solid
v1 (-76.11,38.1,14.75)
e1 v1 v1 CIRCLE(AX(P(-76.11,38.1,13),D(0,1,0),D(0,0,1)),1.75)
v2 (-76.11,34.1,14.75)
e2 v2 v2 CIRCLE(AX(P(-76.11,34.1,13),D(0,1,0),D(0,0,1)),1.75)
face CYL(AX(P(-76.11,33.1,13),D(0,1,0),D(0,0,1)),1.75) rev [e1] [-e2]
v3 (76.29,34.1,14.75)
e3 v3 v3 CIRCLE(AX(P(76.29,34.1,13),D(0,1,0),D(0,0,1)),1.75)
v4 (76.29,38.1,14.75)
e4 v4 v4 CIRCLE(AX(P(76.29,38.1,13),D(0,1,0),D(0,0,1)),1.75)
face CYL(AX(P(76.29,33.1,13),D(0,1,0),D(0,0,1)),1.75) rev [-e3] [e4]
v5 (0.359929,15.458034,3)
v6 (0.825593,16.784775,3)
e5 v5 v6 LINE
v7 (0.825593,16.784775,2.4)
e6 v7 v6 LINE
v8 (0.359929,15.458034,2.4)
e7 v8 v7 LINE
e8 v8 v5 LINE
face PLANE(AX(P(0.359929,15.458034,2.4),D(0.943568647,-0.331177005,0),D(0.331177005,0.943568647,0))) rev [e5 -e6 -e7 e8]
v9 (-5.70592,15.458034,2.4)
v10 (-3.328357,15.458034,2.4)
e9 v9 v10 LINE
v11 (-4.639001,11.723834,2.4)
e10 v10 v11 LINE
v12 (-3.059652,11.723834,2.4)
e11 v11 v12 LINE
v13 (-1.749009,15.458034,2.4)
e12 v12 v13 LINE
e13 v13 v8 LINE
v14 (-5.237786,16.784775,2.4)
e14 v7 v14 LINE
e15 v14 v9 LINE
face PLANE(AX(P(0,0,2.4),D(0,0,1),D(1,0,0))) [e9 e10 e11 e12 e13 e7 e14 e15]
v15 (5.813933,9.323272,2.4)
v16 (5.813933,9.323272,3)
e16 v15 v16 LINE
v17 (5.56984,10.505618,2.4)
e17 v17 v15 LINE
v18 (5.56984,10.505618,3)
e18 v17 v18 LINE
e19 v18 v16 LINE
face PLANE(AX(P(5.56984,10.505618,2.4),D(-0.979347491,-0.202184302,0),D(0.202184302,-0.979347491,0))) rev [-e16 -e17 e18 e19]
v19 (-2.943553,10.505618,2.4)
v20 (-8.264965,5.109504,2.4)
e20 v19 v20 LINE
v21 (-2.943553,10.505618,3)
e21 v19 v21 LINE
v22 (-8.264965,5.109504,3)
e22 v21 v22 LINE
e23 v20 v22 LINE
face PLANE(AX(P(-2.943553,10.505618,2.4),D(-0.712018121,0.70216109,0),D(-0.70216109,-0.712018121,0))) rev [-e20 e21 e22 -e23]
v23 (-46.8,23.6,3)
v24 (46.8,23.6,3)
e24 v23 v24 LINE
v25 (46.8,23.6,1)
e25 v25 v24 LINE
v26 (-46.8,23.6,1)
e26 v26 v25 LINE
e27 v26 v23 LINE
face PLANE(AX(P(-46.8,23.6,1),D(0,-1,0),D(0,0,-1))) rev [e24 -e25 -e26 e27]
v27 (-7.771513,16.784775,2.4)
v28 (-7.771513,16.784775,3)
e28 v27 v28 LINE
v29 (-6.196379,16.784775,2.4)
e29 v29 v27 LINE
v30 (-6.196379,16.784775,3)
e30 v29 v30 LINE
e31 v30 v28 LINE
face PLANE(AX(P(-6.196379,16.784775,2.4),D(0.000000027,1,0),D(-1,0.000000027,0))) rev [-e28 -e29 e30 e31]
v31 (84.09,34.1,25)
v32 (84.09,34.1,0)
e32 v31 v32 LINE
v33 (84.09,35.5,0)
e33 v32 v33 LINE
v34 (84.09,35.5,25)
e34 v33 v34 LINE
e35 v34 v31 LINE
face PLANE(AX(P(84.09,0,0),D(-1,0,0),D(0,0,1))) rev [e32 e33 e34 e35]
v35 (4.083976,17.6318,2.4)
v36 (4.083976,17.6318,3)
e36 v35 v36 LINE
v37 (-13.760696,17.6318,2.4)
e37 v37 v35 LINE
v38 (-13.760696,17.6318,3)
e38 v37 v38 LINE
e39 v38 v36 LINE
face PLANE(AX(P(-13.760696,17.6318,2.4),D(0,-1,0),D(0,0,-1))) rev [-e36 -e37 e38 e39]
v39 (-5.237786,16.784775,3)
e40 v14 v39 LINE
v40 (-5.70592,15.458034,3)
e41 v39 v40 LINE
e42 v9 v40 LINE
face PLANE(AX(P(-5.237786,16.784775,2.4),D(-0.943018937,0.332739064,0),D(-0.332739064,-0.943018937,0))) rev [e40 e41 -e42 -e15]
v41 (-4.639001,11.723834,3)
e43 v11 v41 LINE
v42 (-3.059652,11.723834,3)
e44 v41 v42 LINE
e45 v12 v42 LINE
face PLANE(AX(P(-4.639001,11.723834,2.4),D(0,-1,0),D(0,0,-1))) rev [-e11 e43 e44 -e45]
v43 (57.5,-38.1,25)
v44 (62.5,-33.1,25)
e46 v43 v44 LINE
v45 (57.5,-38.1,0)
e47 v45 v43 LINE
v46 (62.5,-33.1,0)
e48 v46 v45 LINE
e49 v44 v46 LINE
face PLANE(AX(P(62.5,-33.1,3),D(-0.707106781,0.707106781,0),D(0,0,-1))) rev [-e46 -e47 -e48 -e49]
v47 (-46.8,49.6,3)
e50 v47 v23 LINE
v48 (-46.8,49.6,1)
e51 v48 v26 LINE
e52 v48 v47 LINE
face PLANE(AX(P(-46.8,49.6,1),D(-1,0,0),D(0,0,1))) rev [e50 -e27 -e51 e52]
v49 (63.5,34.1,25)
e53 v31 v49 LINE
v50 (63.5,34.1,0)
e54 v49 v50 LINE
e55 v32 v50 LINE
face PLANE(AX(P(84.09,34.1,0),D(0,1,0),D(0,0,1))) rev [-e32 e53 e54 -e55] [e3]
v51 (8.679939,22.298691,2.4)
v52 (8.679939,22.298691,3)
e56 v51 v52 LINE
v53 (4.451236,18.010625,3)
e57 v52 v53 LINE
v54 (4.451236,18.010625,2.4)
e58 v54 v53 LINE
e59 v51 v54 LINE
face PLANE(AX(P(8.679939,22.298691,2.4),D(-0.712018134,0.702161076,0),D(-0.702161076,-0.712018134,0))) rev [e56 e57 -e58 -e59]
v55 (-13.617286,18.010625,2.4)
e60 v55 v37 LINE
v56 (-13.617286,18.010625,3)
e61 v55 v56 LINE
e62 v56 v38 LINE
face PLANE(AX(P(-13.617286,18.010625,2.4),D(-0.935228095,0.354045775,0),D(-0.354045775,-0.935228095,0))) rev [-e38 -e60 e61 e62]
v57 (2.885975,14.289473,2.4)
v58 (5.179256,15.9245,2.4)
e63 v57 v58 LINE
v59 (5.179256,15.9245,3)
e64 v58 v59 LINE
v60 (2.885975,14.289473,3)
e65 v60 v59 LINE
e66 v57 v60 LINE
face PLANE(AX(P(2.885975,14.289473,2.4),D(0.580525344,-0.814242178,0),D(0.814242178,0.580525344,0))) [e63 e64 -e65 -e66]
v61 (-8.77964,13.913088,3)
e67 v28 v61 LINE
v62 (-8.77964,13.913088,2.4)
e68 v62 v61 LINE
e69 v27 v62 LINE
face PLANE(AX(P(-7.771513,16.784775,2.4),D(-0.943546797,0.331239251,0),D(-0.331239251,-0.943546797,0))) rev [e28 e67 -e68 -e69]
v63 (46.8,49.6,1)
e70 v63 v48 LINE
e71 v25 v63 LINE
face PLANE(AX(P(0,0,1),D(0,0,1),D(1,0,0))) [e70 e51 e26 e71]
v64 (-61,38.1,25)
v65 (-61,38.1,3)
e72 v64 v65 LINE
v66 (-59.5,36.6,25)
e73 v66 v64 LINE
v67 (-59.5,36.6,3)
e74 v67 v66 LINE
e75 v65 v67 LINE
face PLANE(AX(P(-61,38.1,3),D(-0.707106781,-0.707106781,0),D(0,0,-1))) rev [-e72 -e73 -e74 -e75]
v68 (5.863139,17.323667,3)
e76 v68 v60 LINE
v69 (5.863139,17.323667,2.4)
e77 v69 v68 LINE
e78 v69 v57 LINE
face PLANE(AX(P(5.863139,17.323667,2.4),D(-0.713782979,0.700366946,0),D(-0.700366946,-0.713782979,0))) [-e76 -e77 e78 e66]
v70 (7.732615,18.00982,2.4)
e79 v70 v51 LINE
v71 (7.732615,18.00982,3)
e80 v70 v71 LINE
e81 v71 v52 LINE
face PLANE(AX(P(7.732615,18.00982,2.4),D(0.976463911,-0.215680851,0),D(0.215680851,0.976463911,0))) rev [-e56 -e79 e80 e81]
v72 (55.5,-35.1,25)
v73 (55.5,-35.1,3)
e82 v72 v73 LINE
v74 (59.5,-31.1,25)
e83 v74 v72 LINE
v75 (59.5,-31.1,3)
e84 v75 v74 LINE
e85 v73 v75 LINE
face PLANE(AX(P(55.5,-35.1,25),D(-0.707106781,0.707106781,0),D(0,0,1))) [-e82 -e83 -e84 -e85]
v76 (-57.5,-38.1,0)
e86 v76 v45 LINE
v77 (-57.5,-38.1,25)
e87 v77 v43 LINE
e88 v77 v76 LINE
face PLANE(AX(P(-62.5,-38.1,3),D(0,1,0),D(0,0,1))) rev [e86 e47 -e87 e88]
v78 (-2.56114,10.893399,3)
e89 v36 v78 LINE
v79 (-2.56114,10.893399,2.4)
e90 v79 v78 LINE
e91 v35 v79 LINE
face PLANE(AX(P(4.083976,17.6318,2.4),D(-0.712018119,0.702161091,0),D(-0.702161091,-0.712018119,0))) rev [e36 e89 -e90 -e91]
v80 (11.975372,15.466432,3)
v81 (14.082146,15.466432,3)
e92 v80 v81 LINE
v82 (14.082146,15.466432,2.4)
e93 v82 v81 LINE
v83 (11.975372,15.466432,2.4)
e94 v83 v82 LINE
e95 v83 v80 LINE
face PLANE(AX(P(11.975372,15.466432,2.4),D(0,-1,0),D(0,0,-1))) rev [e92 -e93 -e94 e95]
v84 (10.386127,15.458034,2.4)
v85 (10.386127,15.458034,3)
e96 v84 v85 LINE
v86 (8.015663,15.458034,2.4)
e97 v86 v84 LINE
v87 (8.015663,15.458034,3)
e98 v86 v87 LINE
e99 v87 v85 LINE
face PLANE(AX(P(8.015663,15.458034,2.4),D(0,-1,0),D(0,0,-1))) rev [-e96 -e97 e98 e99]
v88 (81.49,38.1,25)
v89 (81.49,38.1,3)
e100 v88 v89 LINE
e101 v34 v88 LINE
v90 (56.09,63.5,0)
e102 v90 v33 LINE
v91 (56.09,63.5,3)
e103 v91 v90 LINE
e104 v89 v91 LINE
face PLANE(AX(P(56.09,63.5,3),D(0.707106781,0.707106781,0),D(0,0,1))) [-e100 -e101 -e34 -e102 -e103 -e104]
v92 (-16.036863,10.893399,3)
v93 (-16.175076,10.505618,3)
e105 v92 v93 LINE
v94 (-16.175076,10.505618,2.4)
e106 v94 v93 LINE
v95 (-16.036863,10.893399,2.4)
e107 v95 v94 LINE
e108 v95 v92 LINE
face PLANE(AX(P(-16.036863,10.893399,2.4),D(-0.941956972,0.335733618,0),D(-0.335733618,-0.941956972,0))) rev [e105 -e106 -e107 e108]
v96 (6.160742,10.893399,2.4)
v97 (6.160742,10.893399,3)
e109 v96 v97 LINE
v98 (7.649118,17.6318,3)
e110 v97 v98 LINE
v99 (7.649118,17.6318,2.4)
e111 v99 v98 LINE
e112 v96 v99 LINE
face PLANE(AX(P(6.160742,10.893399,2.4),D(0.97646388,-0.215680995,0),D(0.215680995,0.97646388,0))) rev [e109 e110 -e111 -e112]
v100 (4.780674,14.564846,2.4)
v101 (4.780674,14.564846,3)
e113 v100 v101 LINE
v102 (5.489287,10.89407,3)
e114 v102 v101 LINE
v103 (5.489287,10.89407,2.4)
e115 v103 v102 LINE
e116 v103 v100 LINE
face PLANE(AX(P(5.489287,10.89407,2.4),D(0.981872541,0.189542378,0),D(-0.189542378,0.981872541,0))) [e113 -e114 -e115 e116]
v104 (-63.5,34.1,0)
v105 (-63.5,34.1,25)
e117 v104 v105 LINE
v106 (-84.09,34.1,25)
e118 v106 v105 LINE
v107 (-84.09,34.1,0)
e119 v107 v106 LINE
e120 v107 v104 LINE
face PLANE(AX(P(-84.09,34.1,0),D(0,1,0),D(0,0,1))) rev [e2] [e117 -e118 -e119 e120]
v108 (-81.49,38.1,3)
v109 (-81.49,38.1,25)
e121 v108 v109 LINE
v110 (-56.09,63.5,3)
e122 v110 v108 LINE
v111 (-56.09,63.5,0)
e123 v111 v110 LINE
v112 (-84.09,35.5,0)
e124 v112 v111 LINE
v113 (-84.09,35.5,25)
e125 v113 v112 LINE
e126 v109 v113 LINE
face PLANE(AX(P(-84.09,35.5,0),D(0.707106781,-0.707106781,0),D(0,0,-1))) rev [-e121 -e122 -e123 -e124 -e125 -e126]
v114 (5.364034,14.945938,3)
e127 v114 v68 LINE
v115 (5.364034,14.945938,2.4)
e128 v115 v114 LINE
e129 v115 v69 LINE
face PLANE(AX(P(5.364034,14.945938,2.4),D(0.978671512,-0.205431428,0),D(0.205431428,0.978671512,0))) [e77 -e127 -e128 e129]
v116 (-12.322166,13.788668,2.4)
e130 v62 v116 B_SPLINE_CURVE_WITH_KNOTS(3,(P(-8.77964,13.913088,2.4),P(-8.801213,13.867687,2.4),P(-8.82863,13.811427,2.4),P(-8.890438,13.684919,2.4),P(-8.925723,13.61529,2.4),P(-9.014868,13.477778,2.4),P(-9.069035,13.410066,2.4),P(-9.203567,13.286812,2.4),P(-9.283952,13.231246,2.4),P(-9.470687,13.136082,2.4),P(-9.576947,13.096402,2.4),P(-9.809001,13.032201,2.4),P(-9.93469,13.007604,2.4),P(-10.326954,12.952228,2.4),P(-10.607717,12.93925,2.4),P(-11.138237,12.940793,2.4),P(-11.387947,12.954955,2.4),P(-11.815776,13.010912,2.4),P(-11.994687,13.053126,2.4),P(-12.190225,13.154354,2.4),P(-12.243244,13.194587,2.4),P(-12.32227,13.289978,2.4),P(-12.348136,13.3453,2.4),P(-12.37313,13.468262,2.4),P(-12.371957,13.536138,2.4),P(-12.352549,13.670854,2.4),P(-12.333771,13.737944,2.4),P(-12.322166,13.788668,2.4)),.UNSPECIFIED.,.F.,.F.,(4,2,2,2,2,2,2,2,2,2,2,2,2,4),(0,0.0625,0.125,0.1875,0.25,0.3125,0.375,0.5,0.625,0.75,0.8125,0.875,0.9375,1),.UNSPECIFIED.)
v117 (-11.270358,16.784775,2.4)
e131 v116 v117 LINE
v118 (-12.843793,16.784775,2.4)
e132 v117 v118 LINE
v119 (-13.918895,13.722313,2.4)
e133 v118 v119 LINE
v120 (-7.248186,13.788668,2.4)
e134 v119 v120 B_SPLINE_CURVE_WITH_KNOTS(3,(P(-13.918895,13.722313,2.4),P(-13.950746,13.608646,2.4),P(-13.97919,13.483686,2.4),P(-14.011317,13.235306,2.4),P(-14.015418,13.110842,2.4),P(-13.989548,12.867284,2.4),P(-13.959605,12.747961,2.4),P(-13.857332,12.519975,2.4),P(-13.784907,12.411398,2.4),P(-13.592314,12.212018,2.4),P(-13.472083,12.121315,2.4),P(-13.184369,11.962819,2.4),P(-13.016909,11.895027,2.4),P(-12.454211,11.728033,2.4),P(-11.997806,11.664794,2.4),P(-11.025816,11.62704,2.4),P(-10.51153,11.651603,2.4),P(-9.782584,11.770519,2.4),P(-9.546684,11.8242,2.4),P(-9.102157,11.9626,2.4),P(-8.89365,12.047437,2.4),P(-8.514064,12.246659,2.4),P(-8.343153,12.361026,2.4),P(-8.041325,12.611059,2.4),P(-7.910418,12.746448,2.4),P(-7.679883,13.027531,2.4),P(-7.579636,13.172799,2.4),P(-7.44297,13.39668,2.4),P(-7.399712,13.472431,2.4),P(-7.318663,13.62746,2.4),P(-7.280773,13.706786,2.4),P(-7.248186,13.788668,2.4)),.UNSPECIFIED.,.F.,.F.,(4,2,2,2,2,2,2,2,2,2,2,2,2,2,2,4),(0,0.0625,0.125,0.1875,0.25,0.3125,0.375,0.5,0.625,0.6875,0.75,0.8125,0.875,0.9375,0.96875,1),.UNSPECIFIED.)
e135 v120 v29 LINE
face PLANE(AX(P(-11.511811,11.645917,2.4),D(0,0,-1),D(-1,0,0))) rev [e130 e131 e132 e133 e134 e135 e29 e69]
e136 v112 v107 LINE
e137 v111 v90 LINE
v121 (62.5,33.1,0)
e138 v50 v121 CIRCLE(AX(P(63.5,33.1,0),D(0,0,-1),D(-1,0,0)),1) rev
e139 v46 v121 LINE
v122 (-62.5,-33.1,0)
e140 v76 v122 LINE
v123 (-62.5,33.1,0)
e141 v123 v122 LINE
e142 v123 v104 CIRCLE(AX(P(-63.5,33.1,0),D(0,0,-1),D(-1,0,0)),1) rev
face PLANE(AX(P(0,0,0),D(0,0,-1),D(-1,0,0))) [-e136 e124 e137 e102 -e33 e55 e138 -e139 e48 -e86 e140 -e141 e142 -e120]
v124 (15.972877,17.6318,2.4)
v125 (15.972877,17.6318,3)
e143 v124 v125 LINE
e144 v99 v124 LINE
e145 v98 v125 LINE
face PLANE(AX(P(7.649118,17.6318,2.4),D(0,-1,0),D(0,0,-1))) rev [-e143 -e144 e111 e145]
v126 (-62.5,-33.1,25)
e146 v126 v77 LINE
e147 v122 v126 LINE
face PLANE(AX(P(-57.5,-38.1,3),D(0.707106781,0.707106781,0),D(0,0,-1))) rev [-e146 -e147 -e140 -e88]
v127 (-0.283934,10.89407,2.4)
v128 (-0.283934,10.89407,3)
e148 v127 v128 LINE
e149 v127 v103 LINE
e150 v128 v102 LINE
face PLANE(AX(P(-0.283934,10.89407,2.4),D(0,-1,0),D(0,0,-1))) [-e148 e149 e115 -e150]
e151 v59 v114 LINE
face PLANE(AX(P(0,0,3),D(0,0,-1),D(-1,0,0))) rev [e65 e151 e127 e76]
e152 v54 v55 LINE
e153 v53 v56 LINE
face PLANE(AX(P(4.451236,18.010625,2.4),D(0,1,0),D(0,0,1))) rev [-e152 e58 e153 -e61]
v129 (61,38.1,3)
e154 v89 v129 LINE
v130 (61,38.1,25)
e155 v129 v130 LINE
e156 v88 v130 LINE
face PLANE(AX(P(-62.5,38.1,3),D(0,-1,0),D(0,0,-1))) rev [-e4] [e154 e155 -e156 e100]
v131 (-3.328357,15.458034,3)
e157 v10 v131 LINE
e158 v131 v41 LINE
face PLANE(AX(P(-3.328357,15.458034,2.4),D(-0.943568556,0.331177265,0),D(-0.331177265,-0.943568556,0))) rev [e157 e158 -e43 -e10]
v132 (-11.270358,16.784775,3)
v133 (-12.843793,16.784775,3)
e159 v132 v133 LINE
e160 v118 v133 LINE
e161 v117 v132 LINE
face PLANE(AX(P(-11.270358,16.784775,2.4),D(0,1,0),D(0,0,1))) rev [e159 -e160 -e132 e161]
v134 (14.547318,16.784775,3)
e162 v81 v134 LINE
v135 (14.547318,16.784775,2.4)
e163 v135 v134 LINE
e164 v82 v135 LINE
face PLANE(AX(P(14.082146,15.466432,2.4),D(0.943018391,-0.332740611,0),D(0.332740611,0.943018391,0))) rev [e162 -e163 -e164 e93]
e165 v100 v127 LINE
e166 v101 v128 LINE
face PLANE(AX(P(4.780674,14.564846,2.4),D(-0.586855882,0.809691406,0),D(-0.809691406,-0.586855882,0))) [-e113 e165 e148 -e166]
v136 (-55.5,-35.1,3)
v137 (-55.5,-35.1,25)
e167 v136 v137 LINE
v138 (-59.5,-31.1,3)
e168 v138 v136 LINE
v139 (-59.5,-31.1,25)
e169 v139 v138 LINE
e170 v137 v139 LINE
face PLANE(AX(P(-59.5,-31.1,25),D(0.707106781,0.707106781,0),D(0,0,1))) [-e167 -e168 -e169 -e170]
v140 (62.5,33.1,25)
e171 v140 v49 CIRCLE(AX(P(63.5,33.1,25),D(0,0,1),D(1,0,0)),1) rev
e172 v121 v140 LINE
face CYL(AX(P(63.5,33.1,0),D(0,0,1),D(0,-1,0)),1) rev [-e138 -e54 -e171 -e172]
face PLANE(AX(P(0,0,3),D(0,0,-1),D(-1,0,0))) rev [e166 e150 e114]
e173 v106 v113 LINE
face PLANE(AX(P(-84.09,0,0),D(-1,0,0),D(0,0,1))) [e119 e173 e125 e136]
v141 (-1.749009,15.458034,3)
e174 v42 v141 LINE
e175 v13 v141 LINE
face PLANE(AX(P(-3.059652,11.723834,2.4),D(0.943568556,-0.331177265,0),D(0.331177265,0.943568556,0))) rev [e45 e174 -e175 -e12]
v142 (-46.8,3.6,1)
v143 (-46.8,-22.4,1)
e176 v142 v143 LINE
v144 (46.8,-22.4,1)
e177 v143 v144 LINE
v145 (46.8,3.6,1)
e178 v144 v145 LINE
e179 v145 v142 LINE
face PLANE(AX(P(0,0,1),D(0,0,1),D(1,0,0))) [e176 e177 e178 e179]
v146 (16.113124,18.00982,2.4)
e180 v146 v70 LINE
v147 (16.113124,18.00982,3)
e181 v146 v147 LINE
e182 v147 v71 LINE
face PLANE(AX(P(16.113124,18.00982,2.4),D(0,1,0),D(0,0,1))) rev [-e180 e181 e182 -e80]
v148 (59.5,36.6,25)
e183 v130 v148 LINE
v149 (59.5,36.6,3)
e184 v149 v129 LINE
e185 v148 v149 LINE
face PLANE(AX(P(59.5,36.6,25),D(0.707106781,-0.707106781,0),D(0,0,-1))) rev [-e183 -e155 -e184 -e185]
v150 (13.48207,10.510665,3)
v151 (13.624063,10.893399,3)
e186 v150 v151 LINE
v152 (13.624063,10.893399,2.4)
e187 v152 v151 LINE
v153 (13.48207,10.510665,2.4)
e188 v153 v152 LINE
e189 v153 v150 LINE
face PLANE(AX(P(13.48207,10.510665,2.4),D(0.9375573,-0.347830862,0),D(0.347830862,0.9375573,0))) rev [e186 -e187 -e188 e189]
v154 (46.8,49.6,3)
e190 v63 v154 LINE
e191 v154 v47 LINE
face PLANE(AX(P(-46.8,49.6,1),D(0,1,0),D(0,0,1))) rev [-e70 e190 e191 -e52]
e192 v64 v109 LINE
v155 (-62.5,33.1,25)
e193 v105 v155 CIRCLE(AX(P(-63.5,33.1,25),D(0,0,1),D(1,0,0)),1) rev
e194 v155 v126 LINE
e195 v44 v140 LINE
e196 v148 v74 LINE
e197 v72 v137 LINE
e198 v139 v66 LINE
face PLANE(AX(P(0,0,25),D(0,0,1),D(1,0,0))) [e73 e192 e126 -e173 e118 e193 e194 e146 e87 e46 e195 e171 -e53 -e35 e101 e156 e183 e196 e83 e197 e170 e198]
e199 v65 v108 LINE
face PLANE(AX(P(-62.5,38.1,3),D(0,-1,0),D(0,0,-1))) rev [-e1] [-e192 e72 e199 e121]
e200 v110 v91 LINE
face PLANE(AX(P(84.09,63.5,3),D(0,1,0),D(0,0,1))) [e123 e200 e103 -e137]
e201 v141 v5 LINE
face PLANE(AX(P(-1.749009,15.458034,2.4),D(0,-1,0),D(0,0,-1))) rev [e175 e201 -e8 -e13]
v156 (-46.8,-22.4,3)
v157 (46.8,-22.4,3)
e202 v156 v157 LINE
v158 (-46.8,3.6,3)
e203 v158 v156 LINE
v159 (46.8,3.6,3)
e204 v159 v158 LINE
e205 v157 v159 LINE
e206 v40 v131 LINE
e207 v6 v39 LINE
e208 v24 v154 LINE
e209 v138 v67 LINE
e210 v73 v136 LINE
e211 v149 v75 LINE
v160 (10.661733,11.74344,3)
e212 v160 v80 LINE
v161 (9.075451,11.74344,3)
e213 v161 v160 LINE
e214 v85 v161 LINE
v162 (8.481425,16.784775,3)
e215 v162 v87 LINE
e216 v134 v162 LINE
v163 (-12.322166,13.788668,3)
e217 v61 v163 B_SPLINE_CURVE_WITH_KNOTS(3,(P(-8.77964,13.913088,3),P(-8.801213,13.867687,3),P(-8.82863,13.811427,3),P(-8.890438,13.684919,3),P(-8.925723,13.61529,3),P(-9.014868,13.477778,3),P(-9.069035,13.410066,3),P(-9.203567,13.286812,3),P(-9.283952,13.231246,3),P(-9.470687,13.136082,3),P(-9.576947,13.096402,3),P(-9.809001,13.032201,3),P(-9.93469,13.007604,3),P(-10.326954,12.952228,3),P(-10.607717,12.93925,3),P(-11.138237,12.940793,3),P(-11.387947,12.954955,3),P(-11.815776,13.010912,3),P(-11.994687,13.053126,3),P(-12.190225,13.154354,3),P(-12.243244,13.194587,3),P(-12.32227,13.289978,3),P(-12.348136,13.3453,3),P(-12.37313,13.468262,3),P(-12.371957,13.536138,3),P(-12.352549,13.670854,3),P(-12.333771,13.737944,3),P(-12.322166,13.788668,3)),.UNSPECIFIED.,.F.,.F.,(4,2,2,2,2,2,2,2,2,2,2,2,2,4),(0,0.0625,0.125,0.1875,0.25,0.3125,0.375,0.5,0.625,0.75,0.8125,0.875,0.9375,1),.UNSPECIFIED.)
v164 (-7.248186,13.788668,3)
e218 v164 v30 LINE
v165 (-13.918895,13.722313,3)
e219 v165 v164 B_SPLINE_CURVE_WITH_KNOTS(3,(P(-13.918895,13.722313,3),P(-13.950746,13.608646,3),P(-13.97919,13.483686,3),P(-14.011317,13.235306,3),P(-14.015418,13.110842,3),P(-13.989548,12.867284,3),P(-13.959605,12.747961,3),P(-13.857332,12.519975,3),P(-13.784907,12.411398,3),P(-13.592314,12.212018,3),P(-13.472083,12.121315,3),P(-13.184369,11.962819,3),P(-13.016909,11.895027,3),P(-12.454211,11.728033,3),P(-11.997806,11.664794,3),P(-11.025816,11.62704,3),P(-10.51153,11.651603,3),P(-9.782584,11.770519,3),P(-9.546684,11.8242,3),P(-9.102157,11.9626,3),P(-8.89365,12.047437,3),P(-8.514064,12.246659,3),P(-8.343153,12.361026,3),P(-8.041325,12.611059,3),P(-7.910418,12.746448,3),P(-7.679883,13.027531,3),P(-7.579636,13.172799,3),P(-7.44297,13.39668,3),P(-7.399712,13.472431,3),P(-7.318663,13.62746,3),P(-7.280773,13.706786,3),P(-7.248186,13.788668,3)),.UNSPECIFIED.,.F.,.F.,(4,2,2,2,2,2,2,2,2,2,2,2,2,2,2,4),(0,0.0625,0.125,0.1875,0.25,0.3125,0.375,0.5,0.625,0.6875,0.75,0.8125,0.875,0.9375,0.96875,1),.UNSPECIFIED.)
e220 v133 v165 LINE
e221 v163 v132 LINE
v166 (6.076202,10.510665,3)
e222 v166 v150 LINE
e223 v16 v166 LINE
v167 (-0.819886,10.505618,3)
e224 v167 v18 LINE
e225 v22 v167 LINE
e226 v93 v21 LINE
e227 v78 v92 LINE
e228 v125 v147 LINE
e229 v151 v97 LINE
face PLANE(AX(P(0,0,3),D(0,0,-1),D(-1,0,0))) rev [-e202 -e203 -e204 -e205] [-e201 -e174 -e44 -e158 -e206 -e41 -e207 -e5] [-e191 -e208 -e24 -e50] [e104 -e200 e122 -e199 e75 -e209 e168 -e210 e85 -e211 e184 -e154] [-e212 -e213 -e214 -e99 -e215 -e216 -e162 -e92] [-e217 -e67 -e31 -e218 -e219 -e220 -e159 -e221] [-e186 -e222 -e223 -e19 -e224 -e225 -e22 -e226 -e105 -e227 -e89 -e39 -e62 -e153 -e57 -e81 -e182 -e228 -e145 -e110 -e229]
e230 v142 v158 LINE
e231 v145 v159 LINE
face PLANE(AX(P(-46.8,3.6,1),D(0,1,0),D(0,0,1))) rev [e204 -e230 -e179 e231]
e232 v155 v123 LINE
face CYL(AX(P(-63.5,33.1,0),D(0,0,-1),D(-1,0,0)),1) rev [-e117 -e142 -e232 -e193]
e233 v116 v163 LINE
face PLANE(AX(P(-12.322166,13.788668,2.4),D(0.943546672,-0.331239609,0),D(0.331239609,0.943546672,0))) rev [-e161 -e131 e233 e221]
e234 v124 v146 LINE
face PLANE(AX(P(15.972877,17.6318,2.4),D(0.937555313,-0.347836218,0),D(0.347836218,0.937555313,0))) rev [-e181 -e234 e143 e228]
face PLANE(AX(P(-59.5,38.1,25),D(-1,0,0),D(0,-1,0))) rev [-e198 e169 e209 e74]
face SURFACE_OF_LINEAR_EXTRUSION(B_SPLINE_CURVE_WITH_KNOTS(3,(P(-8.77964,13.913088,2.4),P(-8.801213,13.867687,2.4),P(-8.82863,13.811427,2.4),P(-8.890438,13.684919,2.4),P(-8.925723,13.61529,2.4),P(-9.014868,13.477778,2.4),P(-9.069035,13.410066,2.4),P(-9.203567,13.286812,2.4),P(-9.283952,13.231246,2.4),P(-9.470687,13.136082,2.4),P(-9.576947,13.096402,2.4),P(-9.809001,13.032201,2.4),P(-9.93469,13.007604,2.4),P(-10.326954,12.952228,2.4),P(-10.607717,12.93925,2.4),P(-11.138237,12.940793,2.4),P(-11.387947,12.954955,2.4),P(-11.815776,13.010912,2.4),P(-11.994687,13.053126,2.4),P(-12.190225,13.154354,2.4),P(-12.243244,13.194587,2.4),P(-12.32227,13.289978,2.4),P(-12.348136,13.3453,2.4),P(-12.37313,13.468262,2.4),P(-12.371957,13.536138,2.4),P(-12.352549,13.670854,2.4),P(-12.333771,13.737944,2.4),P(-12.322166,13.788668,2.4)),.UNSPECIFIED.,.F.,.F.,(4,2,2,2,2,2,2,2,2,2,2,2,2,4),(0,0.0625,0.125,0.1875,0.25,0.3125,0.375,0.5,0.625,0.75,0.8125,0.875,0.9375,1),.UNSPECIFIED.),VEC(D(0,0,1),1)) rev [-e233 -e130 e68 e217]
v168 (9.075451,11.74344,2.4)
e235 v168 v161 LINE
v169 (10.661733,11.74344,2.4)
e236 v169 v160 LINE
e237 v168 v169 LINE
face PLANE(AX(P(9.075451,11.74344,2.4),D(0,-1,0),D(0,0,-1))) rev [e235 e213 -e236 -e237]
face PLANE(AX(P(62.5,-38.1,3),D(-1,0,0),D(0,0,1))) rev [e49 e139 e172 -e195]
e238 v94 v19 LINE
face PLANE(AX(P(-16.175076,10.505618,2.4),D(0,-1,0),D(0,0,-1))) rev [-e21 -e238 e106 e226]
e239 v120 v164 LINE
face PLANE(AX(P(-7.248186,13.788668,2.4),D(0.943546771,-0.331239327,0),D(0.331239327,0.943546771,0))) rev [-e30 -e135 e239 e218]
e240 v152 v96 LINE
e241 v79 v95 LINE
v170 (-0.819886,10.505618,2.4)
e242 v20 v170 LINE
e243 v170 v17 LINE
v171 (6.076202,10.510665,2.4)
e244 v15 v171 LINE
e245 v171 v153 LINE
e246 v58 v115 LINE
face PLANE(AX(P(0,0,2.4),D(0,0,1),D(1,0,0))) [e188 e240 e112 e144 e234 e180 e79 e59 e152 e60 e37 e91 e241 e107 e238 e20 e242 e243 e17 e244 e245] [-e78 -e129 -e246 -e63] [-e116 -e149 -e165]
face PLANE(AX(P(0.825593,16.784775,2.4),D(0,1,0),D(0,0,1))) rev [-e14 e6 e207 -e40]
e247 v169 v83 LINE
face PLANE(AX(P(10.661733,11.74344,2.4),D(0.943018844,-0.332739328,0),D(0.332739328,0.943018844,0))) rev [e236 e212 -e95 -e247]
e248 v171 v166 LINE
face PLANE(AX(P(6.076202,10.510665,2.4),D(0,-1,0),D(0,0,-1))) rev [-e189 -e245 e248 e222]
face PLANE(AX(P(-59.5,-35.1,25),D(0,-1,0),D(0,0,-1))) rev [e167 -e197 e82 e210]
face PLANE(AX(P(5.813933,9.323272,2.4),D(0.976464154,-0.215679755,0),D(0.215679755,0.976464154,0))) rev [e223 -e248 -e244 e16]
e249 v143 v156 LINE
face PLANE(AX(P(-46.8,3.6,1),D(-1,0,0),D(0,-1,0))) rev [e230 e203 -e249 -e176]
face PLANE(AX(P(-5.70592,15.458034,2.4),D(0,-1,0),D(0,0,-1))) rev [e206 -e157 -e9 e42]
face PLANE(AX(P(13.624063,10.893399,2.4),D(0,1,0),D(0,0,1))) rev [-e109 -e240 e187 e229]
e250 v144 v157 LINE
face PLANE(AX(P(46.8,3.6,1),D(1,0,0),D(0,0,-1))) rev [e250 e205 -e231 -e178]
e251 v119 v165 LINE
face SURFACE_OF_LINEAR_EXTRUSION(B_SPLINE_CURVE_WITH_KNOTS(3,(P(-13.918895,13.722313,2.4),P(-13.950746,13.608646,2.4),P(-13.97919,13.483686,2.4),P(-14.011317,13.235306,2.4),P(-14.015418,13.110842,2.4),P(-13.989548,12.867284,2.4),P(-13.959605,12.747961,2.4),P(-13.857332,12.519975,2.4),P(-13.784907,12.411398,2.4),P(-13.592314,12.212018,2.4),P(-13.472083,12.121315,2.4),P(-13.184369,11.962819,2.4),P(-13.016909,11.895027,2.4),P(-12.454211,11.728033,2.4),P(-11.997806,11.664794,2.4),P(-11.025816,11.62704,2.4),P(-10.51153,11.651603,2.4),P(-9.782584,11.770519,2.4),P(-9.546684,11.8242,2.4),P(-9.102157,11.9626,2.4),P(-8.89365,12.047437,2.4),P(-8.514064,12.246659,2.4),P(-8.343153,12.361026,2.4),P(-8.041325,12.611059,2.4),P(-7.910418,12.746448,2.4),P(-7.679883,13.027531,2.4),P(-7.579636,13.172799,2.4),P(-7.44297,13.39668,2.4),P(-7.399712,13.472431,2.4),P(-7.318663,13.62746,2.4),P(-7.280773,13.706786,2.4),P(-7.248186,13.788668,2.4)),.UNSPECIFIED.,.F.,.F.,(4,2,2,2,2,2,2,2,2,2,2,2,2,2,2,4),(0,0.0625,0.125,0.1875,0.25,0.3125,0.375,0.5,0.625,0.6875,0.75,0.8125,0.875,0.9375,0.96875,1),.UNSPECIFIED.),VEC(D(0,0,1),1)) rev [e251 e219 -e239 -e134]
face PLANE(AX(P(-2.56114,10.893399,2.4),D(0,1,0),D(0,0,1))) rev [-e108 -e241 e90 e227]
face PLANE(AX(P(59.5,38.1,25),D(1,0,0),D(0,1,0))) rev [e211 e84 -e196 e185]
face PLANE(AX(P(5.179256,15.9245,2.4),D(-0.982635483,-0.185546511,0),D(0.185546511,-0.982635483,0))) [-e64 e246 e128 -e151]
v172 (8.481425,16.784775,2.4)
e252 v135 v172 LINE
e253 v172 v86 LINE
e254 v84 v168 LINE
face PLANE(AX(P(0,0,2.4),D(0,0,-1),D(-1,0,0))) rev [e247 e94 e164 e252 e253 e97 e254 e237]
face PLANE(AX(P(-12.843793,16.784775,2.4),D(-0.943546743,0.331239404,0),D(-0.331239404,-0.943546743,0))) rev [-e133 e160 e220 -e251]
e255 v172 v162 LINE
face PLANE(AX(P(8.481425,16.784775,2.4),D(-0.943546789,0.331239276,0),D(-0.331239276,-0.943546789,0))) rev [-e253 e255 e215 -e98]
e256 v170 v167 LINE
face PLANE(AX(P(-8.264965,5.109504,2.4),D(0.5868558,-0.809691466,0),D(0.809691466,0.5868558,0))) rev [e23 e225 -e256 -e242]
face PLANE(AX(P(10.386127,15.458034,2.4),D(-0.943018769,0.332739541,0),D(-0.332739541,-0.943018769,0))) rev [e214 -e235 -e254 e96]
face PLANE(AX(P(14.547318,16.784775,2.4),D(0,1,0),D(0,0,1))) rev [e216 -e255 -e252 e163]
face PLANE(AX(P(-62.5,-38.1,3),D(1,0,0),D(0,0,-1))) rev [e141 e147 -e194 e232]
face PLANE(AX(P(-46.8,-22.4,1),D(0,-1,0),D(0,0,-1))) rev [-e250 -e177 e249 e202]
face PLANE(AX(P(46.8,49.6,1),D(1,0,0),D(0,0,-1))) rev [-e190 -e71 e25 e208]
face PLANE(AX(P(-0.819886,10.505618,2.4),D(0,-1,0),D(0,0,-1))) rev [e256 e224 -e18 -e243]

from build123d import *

# Parameters (mm, degrees)
SKETCH1_W           = 125
SKETCH1_H           = 76.2
BOSS_EXTRUDE1_DEPTH = 3
SKETCH2_W           = 3
SKETCH2_H           = 76.2
BOSS_EXTRUDE2_DEPTH = 22
SKETCH4_W           = 25
SKETCH4_H           = 4
BOSS_EXTRUDE4_DEPTH = 21.59
SKETCH5_W           = 25
SKETCH5_H           = 4
BOSS_EXTRUDE5_DEPTH = 21.59
SKETCH6_W           = 168.18
SKETCH6_H           = 25.4
BOSS_EXTRUDE6_DEPTH = 3
CHAMFER1_SIZE       = 28
SKETCH7_W           = 93.6
SKETCH7_H           = 26
CUT_EXTRUDE1_DEPTH  = 2
SKETCH9_W           = 119
SKETCH9_H           = 3
BOSS_EXTRUDE7_DEPTH = 22
CHAMFER2_SIZE       = 4
CHAMFER3_SIZE       = 5
CUT_EXTRUDE2_START  = -0.6
CUT_EXTRUDE2_DEPTH  = 0.6
SKETCH11_R          = 1.75
CUT_EXTRUDE3_DEPTH  = 5
FILLET1_R           = 1
CHAMFER4_SIZE       = 1.5


# Read off the part's stored shape, not the designer's step: Cut-Extrude2
with BuildPart() as part:
    # Sketch1 → Boss-Extrude1 (new body)
    with BuildSketch(Plane.XY):
        Rectangle(SKETCH1_W, SKETCH1_H)
    extrude(amount=BOSS_EXTRUDE1_DEPTH)

    # Sketch2 → Boss-Extrude2 (add)
    with BuildSketch(Plane.XY.offset(3)):
        with Locations((-61, 0)):
            Rectangle(SKETCH2_W, SKETCH2_H)
        with Locations((61, 0)):
            Rectangle(SKETCH2_W, SKETCH2_H)
    extrude(amount=BOSS_EXTRUDE2_DEPTH)

    # Sketch4 → Boss-Extrude4 (add)
    with BuildSketch(Plane.ZY.offset(62.5)):
        with Locations((12.5, 36.1)):
            Rectangle(SKETCH4_W, SKETCH4_H)
    extrude(amount=BOSS_EXTRUDE4_DEPTH)

    # Sketch5 → Boss-Extrude5 (add)
    with BuildSketch(Plane(origin=(62.5, 0, 0), x_dir=(0, 0, -1), z_dir=(1, 0, 0))):
        with Locations((-12.5, 36.1)):
            Rectangle(SKETCH5_W, SKETCH5_H)
    extrude(amount=BOSS_EXTRUDE5_DEPTH)

    # Sketch6 → Boss-Extrude6 (add)
    with BuildSketch(Plane(origin=(0, 0, 0), x_dir=(-1, 0, 0), z_dir=(0, 0, -1))):
        with Locations((0, 50.8)):
            Rectangle(SKETCH6_W, SKETCH6_H)
    extrude(amount=-BOSS_EXTRUDE6_DEPTH)

    # Chamfer1
    chamfer1_edges = [part.edges().sort_by_distance(p)[0] for p in [
        (-84.09, 63.5, 1.5),
        (84.09, 63.5, 1.5),
    ]]
    chamfer(chamfer1_edges, length=CHAMFER1_SIZE)

    # Sketch7 → Cut-Extrude1 (cut)
    with BuildSketch(Plane.XY.offset(3)):
        with Locations((0, -9.4)):
            Rectangle(SKETCH7_W, SKETCH7_H)
        with Locations((0, 36.6)):
            Rectangle(SKETCH7_W, SKETCH7_H)
    extrude(amount=-CUT_EXTRUDE1_DEPTH, mode=Mode.SUBTRACT)

    # Sketch9 → Boss-Extrude7 (add)
    with BuildSketch(Plane.XY.offset(3)):
        with Locations((0, -36.6)):
            Rectangle(SKETCH9_W, SKETCH9_H)
    extrude(amount=BOSS_EXTRUDE7_DEPTH)

    # Chamfer2
    chamfer2_edges = [part.edges().sort_by_distance(p)[0] for p in [
        (-59.5, -35.1, 14),
        (59.5, -35.1, 14),
    ]]
    chamfer(chamfer2_edges, length=CHAMFER2_SIZE)

    # Chamfer3
    chamfer3_edges = [part.edges().sort_by_distance(p)[0] for p in [
        (62.5, -38.1, 12.5),
        (-62.5, -38.1, 12.5),
    ]]
    chamfer(chamfer3_edges, length=CHAMFER3_SIZE)

    # Cut-Extrude2 outline → Cut-Extrude2 (cut)
    # profile 1 of 4: a face of its own
    with BuildSketch(Plane.XY.offset(3).offset(CUT_EXTRUDE2_START)):
        with BuildLine():
            Line((-12.843793417, 16.784775128), (-13.918894641, 13.722312614))
            add(Edge.make_bspline(
                [(-13.918894641, 13.722312614), (-13.950745906, 13.608646354), (-13.97919001, 13.483685694), (-14.011317489, 13.235305925), (-14.01541758, 13.110841548), (-13.989547543, 12.867284383), (-13.959604678, 12.747961158), (-13.857332343, 12.519974586), (-13.78490702, 12.411398187), (-13.592313629, 12.212018271), (-13.472083062, 12.121314997), (-13.184369222, 11.962818623), (-13.016909084, 11.895027419), (-12.454211206, 11.728033285), (-11.997806272, 11.664794493), (-11.025815686, 11.62704002), (-10.511530183, 11.651603075), (-9.78258436, 11.770518687), (-9.546683753, 11.824200176), (-9.102156978, 11.962599668), (-8.89364967, 12.047436893), (-8.514064046, 12.246658938), (-8.343153207, 12.361026326), (-8.04132547, 12.611058926), (-7.910418089, 12.746448479), (-7.679883041, 13.0275306), (-7.579636344, 13.172799488), (-7.44297026, 13.39668043), (-7.39971151, 13.472431032), (-7.318663078, 13.627460279), (-7.280772846, 13.706786212), (-7.248185858, 13.788667895)],
                knots=[0, 0, 0, 0, 0.0625, 0.0625, 0.125, 0.125, 0.1875, 0.1875, 0.25, 0.25, 0.3125, 0.3125, 0.375, 0.375, 0.5, 0.5, 0.625, 0.625, 0.6875, 0.6875, 0.75, 0.75, 0.8125, 0.8125, 0.875, 0.875, 0.9375, 0.9375, 0.96875, 0.96875, 1, 1, 1, 1], degree=3))
            Line((-7.248185858, 13.788667895), (-6.196379448, 16.784775128))
            Line((-6.196379448, 16.784775128), (-7.771512854, 16.784775171))
            Line((-7.771512854, 16.784775171), (-8.779640442, 13.913087848))
            add(Edge.make_bspline(
                [(-8.779640442, 13.913087848), (-8.801212863, 13.867686768), (-8.828630281, 13.811426743), (-8.890437912, 13.684919137), (-8.925723343, 13.615289873), (-9.014867696, 13.477778317), (-9.069034752, 13.410065742), (-9.20356673, 13.286811644), (-9.283951715, 13.231246188), (-9.470687062, 13.136081945), (-9.576947425, 13.096402347), (-9.809000897, 13.032201026), (-9.934689567, 13.00760449), (-10.326953956, 12.952228061), (-10.607716868, 12.939250309), (-11.138236784, 12.940792557), (-11.387946526, 12.95495502), (-11.815776289, 13.010911905), (-11.994686961, 13.05312605), (-12.19022456, 13.154353945), (-12.243244201, 13.194586759), (-12.322270156, 13.289978248), (-12.348136332, 13.345299657), (-12.373130151, 13.46826163), (-12.371956966, 13.5361378), (-12.35254935, 13.67085438), (-12.333771283, 13.737944141), (-12.322165603, 13.788667937)],
                knots=[0, 0, 0, 0, 0.0625, 0.0625, 0.125, 0.125, 0.1875, 0.1875, 0.25, 0.25, 0.3125, 0.3125, 0.375, 0.375, 0.5, 0.5, 0.625, 0.625, 0.75, 0.75, 0.8125, 0.8125, 0.875, 0.875, 0.9375, 0.9375, 1, 1, 1, 1], degree=3))
            Line((-12.322165603, 13.788667937), (-11.2703582, 16.784775128))
            Line((-11.2703582, 16.784775128), (-12.843793417, 16.784775128))
        make_face()
    # profile 2 of 4: a face of its own
    with BuildSketch(Plane.XY.offset(3).offset(CUT_EXTRUDE2_START)):
        Polygon((14.082145905, 15.466432145), (14.547318434, 16.784775128), (8.481425261, 16.784775128), (8.015662645, 15.45803385), (10.386127447, 15.45803385), (9.075451111, 11.743439605), (10.661733364, 11.743439605), (11.975372051, 15.466432145), align=None)
    # profile 3 of 4: a face of its own
    with BuildSketch(Plane.XY.offset(3).offset(CUT_EXTRUDE2_START)):
        Polygon((0.359928822, 15.45803385), (0.825593089, 16.784775128), (-5.237786258, 16.784775128), (-5.705919648, 15.45803385), (-3.328357423, 15.45803385), (-4.639000977, 11.723834147), (-3.059652234, 11.723834147), (-1.74900868, 15.45803385), align=None)
    # profile 4 of 4: a face of its own
    with BuildSketch(Plane.XY.offset(3).offset(CUT_EXTRUDE2_START)):
        Polygon((7.732615088, 18.009820452), (8.67993853, 22.298690548), (4.451236342, 18.010625114), (-13.617285872, 18.010625114), (-13.760696138, 17.631800344), (4.083976363, 17.631800344), (-2.561139847, 10.89339914), (-16.036862666, 10.89339914), (-16.175076152, 10.505618026), (-2.943552817, 10.505618026), (-8.264964605, 5.10950355), (-0.819885517, 10.505618026), (5.569839691, 10.505618026), (5.813932632, 9.32327198), (6.07620201, 10.510665049), (13.482070183, 10.510665049), (13.624063348, 10.89339914), (6.160742258, 10.89339914), (7.649117922, 17.631800344), (15.972876762, 17.631800344), (16.113123511, 18.009820452), align=None)
        Polygon((-0.283933962, 10.894070437), (4.780674194, 14.564845582), (5.489286994, 10.894070437), align=None, mode=Mode.SUBTRACT)
        Polygon((5.863139247, 17.323666682), (5.364033793, 14.945937564), (5.179256414, 15.9244998), (2.885975157, 14.289472868), align=None, mode=Mode.SUBTRACT)
    extrude(amount=CUT_EXTRUDE2_DEPTH, mode=Mode.SUBTRACT)

    # Sketch11 → Cut-Extrude3 (cut)
    with BuildSketch(Plane(origin=(0, 38.1, 0), x_dir=(1, 0, 0), z_dir=(0, 1, 0))):
        with Locations(Location((-76.11, -13, 0), (0, 0, 270))):
            Circle(SKETCH11_R)
        with Locations(Location((76.29, -13, 0), (0, 0, 270))):
            Circle(SKETCH11_R)
    extrude(amount=-CUT_EXTRUDE3_DEPTH, mode=Mode.SUBTRACT)

    # Fillet1
    fillet1_edges = [part.edges().sort_by_distance(p)[0] for p in [
        (-62.5, 34.1, 12.5),
        (62.5, 34.1, 12.5),
    ]]
    fillet(fillet1_edges, radius=FILLET1_R)

    # Chamfer4
    chamfer4_edges = [part.edges().sort_by_distance(p)[0] for p in [
        (-59.5, 38.1, 14),
        (59.5, 38.1, 14),
    ]]
    chamfer(chamfer4_edges, length=CHAMFER4_SIZE)


solid = part.part
